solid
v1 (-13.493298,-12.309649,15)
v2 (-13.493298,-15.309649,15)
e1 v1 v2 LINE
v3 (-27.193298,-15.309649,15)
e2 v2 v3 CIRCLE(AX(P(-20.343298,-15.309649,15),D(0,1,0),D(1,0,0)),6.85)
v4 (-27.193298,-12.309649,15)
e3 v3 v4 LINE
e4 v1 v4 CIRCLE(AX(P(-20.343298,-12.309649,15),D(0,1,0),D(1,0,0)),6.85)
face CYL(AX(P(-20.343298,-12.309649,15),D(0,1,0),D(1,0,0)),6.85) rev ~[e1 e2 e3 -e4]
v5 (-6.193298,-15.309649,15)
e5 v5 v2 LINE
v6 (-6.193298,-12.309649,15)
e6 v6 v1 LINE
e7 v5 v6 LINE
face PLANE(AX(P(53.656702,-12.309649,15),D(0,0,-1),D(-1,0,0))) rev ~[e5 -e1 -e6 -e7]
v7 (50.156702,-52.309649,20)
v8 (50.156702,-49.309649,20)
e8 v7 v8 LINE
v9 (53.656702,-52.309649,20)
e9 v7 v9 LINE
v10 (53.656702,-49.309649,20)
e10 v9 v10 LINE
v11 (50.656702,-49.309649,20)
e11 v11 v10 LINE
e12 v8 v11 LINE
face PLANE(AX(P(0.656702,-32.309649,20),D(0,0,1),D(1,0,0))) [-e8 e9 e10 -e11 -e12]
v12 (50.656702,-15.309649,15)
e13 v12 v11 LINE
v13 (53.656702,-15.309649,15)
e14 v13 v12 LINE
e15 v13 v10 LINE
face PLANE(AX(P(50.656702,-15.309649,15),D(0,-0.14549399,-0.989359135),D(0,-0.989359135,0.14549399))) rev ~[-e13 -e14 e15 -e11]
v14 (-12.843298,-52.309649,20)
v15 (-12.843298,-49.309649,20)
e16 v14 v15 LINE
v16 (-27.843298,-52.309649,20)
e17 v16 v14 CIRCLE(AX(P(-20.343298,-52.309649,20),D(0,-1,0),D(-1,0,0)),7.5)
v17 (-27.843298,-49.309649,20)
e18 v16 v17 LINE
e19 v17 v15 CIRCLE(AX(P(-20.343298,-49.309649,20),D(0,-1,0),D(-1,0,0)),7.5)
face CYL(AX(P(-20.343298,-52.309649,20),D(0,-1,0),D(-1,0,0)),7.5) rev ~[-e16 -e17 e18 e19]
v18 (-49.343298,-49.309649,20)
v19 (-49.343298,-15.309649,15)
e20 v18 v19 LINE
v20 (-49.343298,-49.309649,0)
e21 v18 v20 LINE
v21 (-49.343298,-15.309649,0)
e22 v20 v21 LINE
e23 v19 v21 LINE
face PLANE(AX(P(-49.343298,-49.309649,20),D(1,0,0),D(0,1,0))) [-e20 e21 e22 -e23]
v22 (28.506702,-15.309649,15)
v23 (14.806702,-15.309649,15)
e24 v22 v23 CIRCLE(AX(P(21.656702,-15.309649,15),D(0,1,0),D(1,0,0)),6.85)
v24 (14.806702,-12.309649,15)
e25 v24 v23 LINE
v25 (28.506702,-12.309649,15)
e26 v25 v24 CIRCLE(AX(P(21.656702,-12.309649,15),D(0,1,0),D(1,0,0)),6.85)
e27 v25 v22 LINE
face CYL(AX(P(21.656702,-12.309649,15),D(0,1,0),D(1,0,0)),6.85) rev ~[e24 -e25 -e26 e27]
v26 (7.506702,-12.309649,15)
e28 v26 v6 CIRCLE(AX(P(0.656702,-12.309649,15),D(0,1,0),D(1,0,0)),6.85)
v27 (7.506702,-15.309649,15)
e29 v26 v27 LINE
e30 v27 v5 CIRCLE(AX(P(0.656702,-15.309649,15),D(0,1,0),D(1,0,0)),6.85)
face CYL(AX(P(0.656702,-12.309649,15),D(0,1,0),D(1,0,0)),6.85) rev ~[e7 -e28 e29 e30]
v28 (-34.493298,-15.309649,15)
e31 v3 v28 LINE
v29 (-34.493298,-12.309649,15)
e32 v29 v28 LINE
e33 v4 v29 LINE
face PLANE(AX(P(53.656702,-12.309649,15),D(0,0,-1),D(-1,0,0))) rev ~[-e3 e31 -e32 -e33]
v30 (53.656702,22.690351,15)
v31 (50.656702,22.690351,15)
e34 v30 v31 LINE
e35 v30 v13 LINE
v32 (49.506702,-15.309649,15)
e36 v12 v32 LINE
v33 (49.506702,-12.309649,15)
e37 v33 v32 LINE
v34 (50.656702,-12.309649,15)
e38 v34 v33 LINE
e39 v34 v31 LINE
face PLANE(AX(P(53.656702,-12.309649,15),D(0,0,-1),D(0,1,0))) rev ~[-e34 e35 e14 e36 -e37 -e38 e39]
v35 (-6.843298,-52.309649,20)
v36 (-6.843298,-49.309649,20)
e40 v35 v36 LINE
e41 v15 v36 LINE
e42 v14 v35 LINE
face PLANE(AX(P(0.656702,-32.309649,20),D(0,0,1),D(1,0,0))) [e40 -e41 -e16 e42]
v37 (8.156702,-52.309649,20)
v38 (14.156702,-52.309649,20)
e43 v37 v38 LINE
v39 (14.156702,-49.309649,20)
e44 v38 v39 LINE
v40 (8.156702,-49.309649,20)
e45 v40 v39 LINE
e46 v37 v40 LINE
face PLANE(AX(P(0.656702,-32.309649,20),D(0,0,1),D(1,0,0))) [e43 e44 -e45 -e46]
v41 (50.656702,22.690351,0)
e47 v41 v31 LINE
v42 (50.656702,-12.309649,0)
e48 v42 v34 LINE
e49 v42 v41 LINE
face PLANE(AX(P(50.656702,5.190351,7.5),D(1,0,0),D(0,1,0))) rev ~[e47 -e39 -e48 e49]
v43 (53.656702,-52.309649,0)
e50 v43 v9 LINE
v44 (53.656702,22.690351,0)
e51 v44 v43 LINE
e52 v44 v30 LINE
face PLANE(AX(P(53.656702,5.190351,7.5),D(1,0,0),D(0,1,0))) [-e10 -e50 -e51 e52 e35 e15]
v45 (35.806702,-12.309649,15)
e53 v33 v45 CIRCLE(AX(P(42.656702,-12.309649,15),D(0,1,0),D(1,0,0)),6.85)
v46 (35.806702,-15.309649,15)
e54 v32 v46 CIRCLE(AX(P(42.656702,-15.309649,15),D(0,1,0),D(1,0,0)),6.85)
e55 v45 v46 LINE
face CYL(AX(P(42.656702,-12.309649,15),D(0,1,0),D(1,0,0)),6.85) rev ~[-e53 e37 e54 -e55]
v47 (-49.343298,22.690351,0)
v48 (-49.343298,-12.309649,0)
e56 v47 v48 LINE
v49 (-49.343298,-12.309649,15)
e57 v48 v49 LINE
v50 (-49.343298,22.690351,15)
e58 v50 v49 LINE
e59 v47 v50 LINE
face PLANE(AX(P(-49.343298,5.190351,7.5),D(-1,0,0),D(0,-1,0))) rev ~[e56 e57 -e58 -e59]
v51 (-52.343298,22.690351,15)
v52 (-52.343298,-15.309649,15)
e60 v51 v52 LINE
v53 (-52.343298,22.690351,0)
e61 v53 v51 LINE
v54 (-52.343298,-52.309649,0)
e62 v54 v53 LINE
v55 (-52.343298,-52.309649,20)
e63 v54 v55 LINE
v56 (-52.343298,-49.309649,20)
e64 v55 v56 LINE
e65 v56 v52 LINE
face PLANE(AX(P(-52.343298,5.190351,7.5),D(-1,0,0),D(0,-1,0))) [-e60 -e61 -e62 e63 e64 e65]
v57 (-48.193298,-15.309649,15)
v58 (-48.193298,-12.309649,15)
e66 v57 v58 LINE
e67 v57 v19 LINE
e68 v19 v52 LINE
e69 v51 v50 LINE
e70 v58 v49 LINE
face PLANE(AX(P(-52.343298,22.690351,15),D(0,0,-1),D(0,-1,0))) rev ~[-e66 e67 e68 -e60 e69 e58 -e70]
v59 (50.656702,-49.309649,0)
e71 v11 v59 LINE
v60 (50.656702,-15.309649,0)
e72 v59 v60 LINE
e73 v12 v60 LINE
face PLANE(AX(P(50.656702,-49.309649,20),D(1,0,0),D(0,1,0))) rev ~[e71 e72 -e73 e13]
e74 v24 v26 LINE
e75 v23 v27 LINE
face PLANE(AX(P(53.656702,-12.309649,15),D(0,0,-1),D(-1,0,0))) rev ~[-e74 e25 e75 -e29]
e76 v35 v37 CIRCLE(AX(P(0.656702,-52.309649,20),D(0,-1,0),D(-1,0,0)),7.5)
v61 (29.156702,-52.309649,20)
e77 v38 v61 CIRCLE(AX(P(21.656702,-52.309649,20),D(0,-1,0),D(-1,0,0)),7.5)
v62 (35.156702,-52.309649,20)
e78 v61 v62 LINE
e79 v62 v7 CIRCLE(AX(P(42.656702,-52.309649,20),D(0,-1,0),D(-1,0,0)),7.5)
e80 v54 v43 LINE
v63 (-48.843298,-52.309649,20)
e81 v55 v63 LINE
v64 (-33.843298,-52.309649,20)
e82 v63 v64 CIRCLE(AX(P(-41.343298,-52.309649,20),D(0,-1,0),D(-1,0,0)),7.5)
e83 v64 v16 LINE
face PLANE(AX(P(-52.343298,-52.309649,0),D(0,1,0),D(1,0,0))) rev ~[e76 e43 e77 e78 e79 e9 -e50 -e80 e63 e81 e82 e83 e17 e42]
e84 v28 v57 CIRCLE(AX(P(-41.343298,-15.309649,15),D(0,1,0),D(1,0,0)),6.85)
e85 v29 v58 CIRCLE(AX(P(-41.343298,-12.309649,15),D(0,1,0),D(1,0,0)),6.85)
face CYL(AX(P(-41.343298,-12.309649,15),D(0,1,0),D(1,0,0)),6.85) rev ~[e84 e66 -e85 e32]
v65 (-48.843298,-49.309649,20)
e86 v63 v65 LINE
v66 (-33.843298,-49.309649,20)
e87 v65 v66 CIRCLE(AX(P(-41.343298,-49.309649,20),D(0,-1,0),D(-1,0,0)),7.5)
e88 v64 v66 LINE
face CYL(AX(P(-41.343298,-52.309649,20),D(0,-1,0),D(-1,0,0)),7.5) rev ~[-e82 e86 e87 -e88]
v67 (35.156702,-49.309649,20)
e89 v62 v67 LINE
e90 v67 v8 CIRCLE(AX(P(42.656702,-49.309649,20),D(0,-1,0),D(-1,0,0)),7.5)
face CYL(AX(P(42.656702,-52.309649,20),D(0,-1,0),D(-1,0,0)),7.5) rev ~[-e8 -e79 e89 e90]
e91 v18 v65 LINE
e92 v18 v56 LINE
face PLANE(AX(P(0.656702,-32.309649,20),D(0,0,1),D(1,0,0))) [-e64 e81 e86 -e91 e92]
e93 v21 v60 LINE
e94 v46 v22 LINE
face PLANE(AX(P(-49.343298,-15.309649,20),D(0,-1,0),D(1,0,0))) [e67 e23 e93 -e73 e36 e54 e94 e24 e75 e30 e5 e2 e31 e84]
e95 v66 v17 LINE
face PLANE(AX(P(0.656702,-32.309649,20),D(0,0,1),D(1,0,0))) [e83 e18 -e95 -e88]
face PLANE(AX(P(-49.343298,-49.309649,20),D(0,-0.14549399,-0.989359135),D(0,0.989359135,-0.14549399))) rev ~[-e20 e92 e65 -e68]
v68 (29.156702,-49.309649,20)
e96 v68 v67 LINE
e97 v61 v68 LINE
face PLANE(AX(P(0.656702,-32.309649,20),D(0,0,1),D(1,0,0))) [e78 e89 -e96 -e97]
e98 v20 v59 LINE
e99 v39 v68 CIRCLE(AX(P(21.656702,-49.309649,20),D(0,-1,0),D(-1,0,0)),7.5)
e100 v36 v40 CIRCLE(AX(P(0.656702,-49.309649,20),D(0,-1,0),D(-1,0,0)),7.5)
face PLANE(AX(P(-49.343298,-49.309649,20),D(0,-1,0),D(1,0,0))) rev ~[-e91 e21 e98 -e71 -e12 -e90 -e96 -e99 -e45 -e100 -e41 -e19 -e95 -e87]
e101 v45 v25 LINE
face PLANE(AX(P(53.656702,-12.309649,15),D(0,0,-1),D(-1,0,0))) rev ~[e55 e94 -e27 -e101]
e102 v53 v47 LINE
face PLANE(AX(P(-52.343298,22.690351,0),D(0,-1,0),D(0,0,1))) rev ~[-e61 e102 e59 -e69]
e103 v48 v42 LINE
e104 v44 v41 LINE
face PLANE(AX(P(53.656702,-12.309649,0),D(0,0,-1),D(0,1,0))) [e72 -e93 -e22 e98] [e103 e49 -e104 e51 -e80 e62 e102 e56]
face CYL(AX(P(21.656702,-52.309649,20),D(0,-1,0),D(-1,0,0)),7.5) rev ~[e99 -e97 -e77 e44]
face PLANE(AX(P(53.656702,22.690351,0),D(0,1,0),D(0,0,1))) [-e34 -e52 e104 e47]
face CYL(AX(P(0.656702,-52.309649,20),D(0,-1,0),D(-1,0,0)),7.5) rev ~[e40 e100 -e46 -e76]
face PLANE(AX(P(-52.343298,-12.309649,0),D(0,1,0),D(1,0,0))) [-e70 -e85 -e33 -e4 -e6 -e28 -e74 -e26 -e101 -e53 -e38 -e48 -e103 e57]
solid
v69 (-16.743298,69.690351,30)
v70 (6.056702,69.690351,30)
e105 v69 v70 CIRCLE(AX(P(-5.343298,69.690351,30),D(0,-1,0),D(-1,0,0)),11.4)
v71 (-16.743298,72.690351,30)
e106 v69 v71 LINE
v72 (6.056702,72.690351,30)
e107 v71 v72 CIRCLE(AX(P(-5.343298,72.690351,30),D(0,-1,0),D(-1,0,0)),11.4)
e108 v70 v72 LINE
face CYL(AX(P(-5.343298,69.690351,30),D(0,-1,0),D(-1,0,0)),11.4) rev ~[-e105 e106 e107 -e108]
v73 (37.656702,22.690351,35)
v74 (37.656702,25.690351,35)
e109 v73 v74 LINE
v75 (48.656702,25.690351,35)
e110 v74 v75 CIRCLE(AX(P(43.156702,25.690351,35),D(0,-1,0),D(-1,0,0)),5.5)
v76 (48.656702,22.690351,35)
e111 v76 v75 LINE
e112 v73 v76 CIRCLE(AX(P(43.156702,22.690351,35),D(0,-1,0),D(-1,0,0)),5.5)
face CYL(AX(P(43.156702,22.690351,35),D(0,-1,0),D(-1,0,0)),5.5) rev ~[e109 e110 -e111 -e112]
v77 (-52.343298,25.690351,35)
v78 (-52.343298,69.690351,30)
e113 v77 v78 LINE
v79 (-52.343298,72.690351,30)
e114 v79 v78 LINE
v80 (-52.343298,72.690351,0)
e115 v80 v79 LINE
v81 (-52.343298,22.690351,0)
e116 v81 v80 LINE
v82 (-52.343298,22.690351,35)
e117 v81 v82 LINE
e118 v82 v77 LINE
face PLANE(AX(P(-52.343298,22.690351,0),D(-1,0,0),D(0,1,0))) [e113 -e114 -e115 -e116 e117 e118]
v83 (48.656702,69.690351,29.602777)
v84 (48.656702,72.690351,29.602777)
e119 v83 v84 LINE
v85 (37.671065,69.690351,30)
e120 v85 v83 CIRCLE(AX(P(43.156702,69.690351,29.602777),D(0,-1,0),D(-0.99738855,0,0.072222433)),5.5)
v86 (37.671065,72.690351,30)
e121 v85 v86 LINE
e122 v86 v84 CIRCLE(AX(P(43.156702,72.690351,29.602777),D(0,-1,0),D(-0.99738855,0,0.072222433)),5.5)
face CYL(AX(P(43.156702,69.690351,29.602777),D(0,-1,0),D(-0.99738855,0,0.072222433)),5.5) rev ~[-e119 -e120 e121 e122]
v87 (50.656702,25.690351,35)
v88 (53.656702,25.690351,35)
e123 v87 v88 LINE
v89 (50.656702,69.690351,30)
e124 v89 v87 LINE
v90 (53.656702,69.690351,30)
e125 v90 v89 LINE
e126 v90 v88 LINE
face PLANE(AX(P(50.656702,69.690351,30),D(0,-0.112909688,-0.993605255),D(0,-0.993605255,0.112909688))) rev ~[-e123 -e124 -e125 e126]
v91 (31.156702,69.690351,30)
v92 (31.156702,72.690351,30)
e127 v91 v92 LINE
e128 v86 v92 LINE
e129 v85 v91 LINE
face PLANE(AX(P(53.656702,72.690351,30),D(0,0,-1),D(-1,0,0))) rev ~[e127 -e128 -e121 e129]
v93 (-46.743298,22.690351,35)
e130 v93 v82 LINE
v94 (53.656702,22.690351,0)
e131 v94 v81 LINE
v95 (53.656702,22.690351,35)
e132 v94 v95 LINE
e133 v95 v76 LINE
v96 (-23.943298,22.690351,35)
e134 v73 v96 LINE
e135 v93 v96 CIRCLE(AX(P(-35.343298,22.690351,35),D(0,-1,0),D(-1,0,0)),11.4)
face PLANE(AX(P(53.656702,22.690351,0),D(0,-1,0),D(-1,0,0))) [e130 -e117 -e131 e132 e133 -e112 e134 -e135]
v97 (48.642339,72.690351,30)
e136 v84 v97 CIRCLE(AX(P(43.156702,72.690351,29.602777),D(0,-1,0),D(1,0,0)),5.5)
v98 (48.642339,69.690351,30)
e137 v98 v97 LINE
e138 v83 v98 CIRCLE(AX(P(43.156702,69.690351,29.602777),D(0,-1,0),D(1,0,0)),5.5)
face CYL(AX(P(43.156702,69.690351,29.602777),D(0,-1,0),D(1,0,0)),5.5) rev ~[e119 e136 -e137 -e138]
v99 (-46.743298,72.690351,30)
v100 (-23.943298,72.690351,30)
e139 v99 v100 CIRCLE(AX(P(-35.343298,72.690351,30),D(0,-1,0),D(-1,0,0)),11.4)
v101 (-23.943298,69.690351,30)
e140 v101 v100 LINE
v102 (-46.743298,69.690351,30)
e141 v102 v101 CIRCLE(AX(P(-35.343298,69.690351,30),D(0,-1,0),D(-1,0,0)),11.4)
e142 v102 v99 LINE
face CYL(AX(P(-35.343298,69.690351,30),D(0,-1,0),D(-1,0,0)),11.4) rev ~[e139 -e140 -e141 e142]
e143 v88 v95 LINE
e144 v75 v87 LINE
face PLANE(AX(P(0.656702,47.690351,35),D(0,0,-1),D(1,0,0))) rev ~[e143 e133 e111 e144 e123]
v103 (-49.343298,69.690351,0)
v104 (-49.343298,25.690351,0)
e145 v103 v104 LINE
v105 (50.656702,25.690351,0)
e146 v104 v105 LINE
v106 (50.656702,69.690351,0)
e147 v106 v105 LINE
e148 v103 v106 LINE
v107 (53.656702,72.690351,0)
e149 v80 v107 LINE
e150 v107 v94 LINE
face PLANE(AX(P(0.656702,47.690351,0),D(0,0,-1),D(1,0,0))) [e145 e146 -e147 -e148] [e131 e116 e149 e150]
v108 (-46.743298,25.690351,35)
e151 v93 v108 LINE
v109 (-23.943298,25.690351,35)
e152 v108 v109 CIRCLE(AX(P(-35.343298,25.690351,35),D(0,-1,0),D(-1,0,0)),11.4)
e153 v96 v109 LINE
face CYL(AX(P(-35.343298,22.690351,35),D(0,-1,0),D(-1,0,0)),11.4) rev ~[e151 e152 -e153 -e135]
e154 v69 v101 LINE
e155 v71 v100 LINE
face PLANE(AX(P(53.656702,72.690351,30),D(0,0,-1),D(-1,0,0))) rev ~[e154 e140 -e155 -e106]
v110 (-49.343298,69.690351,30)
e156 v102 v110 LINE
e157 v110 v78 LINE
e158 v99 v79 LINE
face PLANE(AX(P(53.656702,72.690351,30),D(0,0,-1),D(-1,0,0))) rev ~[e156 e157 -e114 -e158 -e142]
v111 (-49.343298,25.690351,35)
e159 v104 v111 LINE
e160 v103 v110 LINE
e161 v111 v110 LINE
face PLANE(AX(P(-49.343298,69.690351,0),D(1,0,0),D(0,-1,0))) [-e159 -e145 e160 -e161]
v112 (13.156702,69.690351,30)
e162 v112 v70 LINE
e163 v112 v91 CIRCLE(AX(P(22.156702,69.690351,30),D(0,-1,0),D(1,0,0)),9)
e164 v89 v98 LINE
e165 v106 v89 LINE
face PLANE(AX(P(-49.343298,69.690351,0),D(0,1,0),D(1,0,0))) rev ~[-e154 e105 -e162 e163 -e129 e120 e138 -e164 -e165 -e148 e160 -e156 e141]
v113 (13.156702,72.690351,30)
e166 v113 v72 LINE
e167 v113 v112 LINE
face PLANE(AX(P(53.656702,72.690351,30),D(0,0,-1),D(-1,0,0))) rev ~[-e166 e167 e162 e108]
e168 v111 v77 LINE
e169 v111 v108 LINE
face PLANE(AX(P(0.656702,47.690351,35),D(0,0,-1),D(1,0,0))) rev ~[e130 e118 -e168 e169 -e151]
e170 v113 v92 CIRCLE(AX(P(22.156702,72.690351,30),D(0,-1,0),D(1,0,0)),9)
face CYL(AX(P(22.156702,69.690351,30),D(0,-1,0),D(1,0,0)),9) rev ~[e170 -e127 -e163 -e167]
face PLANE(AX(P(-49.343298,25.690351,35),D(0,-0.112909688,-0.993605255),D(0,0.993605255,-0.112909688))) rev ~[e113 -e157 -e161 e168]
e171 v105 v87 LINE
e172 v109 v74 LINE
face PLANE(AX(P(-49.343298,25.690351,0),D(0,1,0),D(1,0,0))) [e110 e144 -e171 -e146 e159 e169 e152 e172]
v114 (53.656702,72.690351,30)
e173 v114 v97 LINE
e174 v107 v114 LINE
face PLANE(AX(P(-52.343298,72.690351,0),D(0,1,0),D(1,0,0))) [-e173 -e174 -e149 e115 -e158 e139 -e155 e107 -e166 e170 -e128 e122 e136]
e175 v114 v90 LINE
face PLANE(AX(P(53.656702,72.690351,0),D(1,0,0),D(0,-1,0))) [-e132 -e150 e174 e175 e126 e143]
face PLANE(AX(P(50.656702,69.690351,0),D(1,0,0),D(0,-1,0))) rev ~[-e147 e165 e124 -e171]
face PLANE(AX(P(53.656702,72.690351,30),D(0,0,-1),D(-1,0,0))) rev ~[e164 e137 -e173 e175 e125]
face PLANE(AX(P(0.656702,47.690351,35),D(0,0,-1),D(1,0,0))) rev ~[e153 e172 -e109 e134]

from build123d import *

# Parameters (mm, degrees)
F0_W      = 106
F0_H      = 40
F1_DEPTH  = 20
F2_W      = 100
F2_H      = 34
F3_DEPTH  = 20
F6_DEPTH  = 3
F7_W      = 106
F7_H      = 5
F8_DEPTH  = 3
F10_DEPTH = 3
F12_W     = 35
F12_H     = 15
F13_DEPTH = 3
F11_W     = 35
F11_H     = 15
F14_DEPTH = 3
F15_W     = 100
F15_H     = 44
F16_DEPTH = 35
F18_DEPTH = 3
F20_DEPTH = 3
F22_DEPTH = 3
F23_W     = 106
F23_H     = 5
F24_DEPTH = 3
F26_DEPTH = 3
F28_DEPTH = 3
F30_DEPTH = 3


# Not quite as in the source:
# - a feature names something its author has since deleted; it is built from what else it names


with BuildPart() as f1:
    # F0 (on Top) → F1 (new body)
    with BuildSketch(Plane.XY):
        with Locations((0.6567015983, -32.3096490646)):
            Rectangle(F0_W, F0_H)
    extrude(amount=F1_DEPTH)

    # F2 (on face) → F3 (cut)
    with BuildSketch(Plane.XY.offset(20)):
        with Locations((0.6567015983, -32.3096490646)):
            Rectangle(F2_W, F2_H)
    extrude(amount=-F3_DEPTH, mode=Mode.SUBTRACT)

    # F5 (on face) + F4 (on face) → F6 (cut)
    with BuildSketch(Plane.XZ.offset(52.3096490646)):
        with BuildLine():
            ThreePointArc((-33.8432984017, 20), (-41.3432984017, 27.5), (-48.8432984017, 20))
            Line((-48.8432984017, 20), (-33.8432984017, 20))
        make_face()
    with BuildSketch(Plane.XZ.offset(52.3096490646)):
        with BuildLine():
            ThreePointArc((-48.8432984017, 20), (-41.3432984017, 12.5), (-33.8432984017, 20))
            Line((-33.8432984017, 20), (-48.8432984017, 20))
        make_face()
        with BuildLine():
            Line((-12.8432984017, 20), (-27.8432984017, 20))
            ThreePointArc((-27.8432984017, 20), (-20.3432984017, 12.5), (-12.8432984017, 20))
        make_face()
        with BuildLine():
            Line((8.1567015983, 20), (-6.8432984017, 20))
            ThreePointArc((-6.8432984017, 20), (0.6567015983, 12.5), (8.1567015983, 20))
        make_face()
        with BuildLine():
            Line((29.1567015983, 20), (14.1567015983, 20))
            ThreePointArc((14.1567015983, 20), (21.6567015983, 12.5), (29.1567015983, 20))
        make_face()
        with BuildLine():
            ThreePointArc((35.1567015983, 20), (42.6567015983, 12.5), (50.1567015983, 20))
            Line((50.1567015983, 20), (35.1567015983, 20))
        make_face()
    extrude(amount=-F6_DEPTH, mode=Mode.SUBTRACT)

    # F7 (on face) → F8 (cut)
    with BuildSketch(Plane(origin=(0, -12.3096490646, 0), x_dir=(-1, 0, 0), z_dir=(0, 1, 0))):
        with Locations((-0.6567015983, 17.5)):
            Rectangle(F7_W, F7_H)
    extrude(amount=-F8_DEPTH, mode=Mode.SUBTRACT)

    # F9 (on face) → F10 (cut)
    with BuildSketch(Plane(origin=(0, -12.3096490646, 0), x_dir=(-1, 0, 0), z_dir=(0, 1, 0))):
        with BuildLine():
            Line((34.4932984017, 15), (48.1932984017, 15))
            ThreePointArc((48.1932984017, 15), (41.3432984017, 21.85), (34.4932984017, 15))
        make_face()
        with BuildLine():
            ThreePointArc((34.4932984017, 15), (41.3432984017, 8.15), (48.1932984017, 15))
            Line((48.1932984017, 15), (34.4932984017, 15))
        make_face()
        with BuildLine():
            Line((13.4932984017, 15), (27.1932984017, 15))
            ThreePointArc((27.1932984017, 15), (20.3432984017, 21.85), (13.4932984017, 15))
        make_face()
        with BuildLine():
            ThreePointArc((13.4932984017, 15), (20.3432984017, 8.15), (27.1932984017, 15))
            Line((27.1932984017, 15), (13.4932984017, 15))
        make_face()
        with BuildLine():
            Line((-7.5067015983, 15), (6.1932984017, 15))
            ThreePointArc((6.1932984017, 15), (-0.6567015983, 21.85), (-7.5067015983, 15))
        make_face()
        with BuildLine():
            ThreePointArc((-7.5067015983, 15), (-0.6567015983, 8.15), (6.1932984017, 15))
            Line((6.1932984017, 15), (-7.5067015983, 15))
        make_face()
        with BuildLine():
            Line((-35.8067015983, 15), (-49.5067015983, 15))
            ThreePointArc((-49.5067015983, 15), (-42.6567015983, 8.15), (-35.8067015983, 15))
        make_face()
        with BuildLine():
            ThreePointArc((-28.5067015983, 15), (-21.6567015983, 8.15), (-14.8067015983, 15))
            Line((-14.8067015983, 15), (-28.5067015983, 15))
        make_face()
    extrude(amount=-F10_DEPTH, mode=Mode.SUBTRACT)

    # F12 (on face) → F13 (join)
    with BuildSketch(Plane(origin=(-52.3432984017, 0, 0), x_dir=(0, -1, 0), z_dir=(-1, 0, 0))):
        with Locations((-5.1903509354, 7.5)):
            Rectangle(F12_W, F12_H)
    extrude(amount=-F13_DEPTH)

    # F11 (on face) → F14 (join)
    with BuildSketch(Plane.YZ.offset(53.6567015983)):
        with Locations((5.1903509354, 7.5)):
            Rectangle(F11_W, F11_H)
    extrude(amount=-F14_DEPTH)

    # F19 (on face) → F20 (cut)
    with BuildSketch(Plane(origin=(50.6567015983, 0, 0), x_dir=(0, -1, 0), z_dir=(-1, 0, 0))):
        Polygon((15.3096490646, 15), (49.3096490646, 20), (15.3096490646, 20), align=None)
    extrude(amount=-F20_DEPTH, mode=Mode.SUBTRACT)

    # F21 (on face) → F22 (cut)
    with BuildSketch(Plane.YZ.offset(-49.3432984017)):
        Polygon((-15.3096490646, 20), (-49.3096490646, 20), (-15.3096490646, 15), align=None)
    extrude(amount=-F22_DEPTH, mode=Mode.SUBTRACT)


with BuildPart() as f16:
    # F15 (on face) → F16 (new body)
    with BuildSketch(Plane(origin=(0, 0, 0), x_dir=(1, 0, 0), z_dir=(0, 0, -1))):
        Polygon((-49.3432984017, -22.6903509354), (-52.3432984017, -22.6903509354), (-52.3432984017, -72.6903509354), (53.6567015983, -72.6903509354), (53.6567015983, -22.6903509354), (50.6567015983, -22.6903509354), align=None)
        with Locations((0.6567015983, -47.6903509354)):
            Rectangle(F15_W, F15_H, mode=Mode.SUBTRACT)
    extrude(amount=-F16_DEPTH)

    # F17 (on face) → F18 (cut)
    with BuildSketch(Plane.XZ.offset(-22.6903509354)):
        with BuildLine():
            ThreePointArc((-46.7432984017, 35), (-35.3432984017, 23.6), (-23.9432984017, 35))
            Line((-23.9432984017, 35), (-46.7432984017, 35))
        make_face()
        with BuildLine():
            Line((48.6567015983, 35), (37.6567015983, 35))
            ThreePointArc((37.6567015983, 35), (43.1567015983, 29.5), (48.6567015983, 35))
        make_face()
    extrude(amount=-F18_DEPTH, mode=Mode.SUBTRACT)

    # F23 (on face) → F24 (cut)
    with BuildSketch(Plane(origin=(0, 72.6903509354, 0), x_dir=(-1, 0, 0), z_dir=(0, 1, 0))):
        with Locations((-0.6567015983, 32.5)):
            Rectangle(F23_W, F23_H)
    extrude(amount=-F24_DEPTH, mode=Mode.SUBTRACT)

    # F25 (on face) → F26 (cut)
    with BuildSketch(Plane.YZ.offset(-49.3432984017)):
        Polygon((69.6903509354, 35), (25.6903509354, 35), (69.6903509354, 30), align=None)
    extrude(amount=-F26_DEPTH, mode=Mode.SUBTRACT)

    # F27 (on face) → F28 (cut)
    with BuildSketch(Plane(origin=(50.6567015983, 0, 0), x_dir=(0, -1, 0), z_dir=(-1, 0, 0))):
        Polygon((-69.6903509354, 30), (-25.6903509354, 35), (-69.6903509354, 35), align=None)
    extrude(amount=-F28_DEPTH, mode=Mode.SUBTRACT)

    # F29 (on face) → F30 (cut)
    with BuildSketch(Plane.XZ.offset(-69.6903509354)):
        with BuildLine():
            ThreePointArc((-46.7432984017, 30), (-35.3432984017, 18.6), (-23.9432984017, 30))
            Line((-23.9432984017, 30), (-46.7432984017, 30))
        make_face()
        with BuildLine():
            Line((6.0567015983, 30), (-16.7432984017, 30))
            ThreePointArc((-16.7432984017, 30), (-5.3432984017, 18.6), (6.0567015983, 30))
        make_face()
        with BuildLine():
            Line((31.1567015983, 30), (13.1567015983, 30))
            ThreePointArc((13.1567015983, 30), (22.1567015983, 21), (31.1567015983, 30))
        make_face()
        with BuildLine():
            ThreePointArc((31.1567015983, 30), (22.1567015983, 39), (13.1567015983, 30))
            Line((13.1567015983, 30), (31.1567015983, 30))
        make_face()
        with BuildLine():
            Line((48.6423386246, 30), (37.6710645721, 30))
            ThreePointArc((37.6710645721, 30), (42.9579601135, 24.1063685331), (48.6567015983, 29.6027766168))
            ThreePointArc((48.6567015983, 29.6027766168), (48.653109682, 29.8015181016), (48.6423386246, 30))
        make_face()
        with BuildLine():
            ThreePointArc((48.6423386246, 30), (43.1567015983, 35.1027766168), (37.6710645721, 30))
            Line((37.6710645721, 30), (48.6423386246, 30))
        make_face()
    extrude(amount=-F30_DEPTH, mode=Mode.SUBTRACT)


solid = Compound([f1.part, f16.part])
